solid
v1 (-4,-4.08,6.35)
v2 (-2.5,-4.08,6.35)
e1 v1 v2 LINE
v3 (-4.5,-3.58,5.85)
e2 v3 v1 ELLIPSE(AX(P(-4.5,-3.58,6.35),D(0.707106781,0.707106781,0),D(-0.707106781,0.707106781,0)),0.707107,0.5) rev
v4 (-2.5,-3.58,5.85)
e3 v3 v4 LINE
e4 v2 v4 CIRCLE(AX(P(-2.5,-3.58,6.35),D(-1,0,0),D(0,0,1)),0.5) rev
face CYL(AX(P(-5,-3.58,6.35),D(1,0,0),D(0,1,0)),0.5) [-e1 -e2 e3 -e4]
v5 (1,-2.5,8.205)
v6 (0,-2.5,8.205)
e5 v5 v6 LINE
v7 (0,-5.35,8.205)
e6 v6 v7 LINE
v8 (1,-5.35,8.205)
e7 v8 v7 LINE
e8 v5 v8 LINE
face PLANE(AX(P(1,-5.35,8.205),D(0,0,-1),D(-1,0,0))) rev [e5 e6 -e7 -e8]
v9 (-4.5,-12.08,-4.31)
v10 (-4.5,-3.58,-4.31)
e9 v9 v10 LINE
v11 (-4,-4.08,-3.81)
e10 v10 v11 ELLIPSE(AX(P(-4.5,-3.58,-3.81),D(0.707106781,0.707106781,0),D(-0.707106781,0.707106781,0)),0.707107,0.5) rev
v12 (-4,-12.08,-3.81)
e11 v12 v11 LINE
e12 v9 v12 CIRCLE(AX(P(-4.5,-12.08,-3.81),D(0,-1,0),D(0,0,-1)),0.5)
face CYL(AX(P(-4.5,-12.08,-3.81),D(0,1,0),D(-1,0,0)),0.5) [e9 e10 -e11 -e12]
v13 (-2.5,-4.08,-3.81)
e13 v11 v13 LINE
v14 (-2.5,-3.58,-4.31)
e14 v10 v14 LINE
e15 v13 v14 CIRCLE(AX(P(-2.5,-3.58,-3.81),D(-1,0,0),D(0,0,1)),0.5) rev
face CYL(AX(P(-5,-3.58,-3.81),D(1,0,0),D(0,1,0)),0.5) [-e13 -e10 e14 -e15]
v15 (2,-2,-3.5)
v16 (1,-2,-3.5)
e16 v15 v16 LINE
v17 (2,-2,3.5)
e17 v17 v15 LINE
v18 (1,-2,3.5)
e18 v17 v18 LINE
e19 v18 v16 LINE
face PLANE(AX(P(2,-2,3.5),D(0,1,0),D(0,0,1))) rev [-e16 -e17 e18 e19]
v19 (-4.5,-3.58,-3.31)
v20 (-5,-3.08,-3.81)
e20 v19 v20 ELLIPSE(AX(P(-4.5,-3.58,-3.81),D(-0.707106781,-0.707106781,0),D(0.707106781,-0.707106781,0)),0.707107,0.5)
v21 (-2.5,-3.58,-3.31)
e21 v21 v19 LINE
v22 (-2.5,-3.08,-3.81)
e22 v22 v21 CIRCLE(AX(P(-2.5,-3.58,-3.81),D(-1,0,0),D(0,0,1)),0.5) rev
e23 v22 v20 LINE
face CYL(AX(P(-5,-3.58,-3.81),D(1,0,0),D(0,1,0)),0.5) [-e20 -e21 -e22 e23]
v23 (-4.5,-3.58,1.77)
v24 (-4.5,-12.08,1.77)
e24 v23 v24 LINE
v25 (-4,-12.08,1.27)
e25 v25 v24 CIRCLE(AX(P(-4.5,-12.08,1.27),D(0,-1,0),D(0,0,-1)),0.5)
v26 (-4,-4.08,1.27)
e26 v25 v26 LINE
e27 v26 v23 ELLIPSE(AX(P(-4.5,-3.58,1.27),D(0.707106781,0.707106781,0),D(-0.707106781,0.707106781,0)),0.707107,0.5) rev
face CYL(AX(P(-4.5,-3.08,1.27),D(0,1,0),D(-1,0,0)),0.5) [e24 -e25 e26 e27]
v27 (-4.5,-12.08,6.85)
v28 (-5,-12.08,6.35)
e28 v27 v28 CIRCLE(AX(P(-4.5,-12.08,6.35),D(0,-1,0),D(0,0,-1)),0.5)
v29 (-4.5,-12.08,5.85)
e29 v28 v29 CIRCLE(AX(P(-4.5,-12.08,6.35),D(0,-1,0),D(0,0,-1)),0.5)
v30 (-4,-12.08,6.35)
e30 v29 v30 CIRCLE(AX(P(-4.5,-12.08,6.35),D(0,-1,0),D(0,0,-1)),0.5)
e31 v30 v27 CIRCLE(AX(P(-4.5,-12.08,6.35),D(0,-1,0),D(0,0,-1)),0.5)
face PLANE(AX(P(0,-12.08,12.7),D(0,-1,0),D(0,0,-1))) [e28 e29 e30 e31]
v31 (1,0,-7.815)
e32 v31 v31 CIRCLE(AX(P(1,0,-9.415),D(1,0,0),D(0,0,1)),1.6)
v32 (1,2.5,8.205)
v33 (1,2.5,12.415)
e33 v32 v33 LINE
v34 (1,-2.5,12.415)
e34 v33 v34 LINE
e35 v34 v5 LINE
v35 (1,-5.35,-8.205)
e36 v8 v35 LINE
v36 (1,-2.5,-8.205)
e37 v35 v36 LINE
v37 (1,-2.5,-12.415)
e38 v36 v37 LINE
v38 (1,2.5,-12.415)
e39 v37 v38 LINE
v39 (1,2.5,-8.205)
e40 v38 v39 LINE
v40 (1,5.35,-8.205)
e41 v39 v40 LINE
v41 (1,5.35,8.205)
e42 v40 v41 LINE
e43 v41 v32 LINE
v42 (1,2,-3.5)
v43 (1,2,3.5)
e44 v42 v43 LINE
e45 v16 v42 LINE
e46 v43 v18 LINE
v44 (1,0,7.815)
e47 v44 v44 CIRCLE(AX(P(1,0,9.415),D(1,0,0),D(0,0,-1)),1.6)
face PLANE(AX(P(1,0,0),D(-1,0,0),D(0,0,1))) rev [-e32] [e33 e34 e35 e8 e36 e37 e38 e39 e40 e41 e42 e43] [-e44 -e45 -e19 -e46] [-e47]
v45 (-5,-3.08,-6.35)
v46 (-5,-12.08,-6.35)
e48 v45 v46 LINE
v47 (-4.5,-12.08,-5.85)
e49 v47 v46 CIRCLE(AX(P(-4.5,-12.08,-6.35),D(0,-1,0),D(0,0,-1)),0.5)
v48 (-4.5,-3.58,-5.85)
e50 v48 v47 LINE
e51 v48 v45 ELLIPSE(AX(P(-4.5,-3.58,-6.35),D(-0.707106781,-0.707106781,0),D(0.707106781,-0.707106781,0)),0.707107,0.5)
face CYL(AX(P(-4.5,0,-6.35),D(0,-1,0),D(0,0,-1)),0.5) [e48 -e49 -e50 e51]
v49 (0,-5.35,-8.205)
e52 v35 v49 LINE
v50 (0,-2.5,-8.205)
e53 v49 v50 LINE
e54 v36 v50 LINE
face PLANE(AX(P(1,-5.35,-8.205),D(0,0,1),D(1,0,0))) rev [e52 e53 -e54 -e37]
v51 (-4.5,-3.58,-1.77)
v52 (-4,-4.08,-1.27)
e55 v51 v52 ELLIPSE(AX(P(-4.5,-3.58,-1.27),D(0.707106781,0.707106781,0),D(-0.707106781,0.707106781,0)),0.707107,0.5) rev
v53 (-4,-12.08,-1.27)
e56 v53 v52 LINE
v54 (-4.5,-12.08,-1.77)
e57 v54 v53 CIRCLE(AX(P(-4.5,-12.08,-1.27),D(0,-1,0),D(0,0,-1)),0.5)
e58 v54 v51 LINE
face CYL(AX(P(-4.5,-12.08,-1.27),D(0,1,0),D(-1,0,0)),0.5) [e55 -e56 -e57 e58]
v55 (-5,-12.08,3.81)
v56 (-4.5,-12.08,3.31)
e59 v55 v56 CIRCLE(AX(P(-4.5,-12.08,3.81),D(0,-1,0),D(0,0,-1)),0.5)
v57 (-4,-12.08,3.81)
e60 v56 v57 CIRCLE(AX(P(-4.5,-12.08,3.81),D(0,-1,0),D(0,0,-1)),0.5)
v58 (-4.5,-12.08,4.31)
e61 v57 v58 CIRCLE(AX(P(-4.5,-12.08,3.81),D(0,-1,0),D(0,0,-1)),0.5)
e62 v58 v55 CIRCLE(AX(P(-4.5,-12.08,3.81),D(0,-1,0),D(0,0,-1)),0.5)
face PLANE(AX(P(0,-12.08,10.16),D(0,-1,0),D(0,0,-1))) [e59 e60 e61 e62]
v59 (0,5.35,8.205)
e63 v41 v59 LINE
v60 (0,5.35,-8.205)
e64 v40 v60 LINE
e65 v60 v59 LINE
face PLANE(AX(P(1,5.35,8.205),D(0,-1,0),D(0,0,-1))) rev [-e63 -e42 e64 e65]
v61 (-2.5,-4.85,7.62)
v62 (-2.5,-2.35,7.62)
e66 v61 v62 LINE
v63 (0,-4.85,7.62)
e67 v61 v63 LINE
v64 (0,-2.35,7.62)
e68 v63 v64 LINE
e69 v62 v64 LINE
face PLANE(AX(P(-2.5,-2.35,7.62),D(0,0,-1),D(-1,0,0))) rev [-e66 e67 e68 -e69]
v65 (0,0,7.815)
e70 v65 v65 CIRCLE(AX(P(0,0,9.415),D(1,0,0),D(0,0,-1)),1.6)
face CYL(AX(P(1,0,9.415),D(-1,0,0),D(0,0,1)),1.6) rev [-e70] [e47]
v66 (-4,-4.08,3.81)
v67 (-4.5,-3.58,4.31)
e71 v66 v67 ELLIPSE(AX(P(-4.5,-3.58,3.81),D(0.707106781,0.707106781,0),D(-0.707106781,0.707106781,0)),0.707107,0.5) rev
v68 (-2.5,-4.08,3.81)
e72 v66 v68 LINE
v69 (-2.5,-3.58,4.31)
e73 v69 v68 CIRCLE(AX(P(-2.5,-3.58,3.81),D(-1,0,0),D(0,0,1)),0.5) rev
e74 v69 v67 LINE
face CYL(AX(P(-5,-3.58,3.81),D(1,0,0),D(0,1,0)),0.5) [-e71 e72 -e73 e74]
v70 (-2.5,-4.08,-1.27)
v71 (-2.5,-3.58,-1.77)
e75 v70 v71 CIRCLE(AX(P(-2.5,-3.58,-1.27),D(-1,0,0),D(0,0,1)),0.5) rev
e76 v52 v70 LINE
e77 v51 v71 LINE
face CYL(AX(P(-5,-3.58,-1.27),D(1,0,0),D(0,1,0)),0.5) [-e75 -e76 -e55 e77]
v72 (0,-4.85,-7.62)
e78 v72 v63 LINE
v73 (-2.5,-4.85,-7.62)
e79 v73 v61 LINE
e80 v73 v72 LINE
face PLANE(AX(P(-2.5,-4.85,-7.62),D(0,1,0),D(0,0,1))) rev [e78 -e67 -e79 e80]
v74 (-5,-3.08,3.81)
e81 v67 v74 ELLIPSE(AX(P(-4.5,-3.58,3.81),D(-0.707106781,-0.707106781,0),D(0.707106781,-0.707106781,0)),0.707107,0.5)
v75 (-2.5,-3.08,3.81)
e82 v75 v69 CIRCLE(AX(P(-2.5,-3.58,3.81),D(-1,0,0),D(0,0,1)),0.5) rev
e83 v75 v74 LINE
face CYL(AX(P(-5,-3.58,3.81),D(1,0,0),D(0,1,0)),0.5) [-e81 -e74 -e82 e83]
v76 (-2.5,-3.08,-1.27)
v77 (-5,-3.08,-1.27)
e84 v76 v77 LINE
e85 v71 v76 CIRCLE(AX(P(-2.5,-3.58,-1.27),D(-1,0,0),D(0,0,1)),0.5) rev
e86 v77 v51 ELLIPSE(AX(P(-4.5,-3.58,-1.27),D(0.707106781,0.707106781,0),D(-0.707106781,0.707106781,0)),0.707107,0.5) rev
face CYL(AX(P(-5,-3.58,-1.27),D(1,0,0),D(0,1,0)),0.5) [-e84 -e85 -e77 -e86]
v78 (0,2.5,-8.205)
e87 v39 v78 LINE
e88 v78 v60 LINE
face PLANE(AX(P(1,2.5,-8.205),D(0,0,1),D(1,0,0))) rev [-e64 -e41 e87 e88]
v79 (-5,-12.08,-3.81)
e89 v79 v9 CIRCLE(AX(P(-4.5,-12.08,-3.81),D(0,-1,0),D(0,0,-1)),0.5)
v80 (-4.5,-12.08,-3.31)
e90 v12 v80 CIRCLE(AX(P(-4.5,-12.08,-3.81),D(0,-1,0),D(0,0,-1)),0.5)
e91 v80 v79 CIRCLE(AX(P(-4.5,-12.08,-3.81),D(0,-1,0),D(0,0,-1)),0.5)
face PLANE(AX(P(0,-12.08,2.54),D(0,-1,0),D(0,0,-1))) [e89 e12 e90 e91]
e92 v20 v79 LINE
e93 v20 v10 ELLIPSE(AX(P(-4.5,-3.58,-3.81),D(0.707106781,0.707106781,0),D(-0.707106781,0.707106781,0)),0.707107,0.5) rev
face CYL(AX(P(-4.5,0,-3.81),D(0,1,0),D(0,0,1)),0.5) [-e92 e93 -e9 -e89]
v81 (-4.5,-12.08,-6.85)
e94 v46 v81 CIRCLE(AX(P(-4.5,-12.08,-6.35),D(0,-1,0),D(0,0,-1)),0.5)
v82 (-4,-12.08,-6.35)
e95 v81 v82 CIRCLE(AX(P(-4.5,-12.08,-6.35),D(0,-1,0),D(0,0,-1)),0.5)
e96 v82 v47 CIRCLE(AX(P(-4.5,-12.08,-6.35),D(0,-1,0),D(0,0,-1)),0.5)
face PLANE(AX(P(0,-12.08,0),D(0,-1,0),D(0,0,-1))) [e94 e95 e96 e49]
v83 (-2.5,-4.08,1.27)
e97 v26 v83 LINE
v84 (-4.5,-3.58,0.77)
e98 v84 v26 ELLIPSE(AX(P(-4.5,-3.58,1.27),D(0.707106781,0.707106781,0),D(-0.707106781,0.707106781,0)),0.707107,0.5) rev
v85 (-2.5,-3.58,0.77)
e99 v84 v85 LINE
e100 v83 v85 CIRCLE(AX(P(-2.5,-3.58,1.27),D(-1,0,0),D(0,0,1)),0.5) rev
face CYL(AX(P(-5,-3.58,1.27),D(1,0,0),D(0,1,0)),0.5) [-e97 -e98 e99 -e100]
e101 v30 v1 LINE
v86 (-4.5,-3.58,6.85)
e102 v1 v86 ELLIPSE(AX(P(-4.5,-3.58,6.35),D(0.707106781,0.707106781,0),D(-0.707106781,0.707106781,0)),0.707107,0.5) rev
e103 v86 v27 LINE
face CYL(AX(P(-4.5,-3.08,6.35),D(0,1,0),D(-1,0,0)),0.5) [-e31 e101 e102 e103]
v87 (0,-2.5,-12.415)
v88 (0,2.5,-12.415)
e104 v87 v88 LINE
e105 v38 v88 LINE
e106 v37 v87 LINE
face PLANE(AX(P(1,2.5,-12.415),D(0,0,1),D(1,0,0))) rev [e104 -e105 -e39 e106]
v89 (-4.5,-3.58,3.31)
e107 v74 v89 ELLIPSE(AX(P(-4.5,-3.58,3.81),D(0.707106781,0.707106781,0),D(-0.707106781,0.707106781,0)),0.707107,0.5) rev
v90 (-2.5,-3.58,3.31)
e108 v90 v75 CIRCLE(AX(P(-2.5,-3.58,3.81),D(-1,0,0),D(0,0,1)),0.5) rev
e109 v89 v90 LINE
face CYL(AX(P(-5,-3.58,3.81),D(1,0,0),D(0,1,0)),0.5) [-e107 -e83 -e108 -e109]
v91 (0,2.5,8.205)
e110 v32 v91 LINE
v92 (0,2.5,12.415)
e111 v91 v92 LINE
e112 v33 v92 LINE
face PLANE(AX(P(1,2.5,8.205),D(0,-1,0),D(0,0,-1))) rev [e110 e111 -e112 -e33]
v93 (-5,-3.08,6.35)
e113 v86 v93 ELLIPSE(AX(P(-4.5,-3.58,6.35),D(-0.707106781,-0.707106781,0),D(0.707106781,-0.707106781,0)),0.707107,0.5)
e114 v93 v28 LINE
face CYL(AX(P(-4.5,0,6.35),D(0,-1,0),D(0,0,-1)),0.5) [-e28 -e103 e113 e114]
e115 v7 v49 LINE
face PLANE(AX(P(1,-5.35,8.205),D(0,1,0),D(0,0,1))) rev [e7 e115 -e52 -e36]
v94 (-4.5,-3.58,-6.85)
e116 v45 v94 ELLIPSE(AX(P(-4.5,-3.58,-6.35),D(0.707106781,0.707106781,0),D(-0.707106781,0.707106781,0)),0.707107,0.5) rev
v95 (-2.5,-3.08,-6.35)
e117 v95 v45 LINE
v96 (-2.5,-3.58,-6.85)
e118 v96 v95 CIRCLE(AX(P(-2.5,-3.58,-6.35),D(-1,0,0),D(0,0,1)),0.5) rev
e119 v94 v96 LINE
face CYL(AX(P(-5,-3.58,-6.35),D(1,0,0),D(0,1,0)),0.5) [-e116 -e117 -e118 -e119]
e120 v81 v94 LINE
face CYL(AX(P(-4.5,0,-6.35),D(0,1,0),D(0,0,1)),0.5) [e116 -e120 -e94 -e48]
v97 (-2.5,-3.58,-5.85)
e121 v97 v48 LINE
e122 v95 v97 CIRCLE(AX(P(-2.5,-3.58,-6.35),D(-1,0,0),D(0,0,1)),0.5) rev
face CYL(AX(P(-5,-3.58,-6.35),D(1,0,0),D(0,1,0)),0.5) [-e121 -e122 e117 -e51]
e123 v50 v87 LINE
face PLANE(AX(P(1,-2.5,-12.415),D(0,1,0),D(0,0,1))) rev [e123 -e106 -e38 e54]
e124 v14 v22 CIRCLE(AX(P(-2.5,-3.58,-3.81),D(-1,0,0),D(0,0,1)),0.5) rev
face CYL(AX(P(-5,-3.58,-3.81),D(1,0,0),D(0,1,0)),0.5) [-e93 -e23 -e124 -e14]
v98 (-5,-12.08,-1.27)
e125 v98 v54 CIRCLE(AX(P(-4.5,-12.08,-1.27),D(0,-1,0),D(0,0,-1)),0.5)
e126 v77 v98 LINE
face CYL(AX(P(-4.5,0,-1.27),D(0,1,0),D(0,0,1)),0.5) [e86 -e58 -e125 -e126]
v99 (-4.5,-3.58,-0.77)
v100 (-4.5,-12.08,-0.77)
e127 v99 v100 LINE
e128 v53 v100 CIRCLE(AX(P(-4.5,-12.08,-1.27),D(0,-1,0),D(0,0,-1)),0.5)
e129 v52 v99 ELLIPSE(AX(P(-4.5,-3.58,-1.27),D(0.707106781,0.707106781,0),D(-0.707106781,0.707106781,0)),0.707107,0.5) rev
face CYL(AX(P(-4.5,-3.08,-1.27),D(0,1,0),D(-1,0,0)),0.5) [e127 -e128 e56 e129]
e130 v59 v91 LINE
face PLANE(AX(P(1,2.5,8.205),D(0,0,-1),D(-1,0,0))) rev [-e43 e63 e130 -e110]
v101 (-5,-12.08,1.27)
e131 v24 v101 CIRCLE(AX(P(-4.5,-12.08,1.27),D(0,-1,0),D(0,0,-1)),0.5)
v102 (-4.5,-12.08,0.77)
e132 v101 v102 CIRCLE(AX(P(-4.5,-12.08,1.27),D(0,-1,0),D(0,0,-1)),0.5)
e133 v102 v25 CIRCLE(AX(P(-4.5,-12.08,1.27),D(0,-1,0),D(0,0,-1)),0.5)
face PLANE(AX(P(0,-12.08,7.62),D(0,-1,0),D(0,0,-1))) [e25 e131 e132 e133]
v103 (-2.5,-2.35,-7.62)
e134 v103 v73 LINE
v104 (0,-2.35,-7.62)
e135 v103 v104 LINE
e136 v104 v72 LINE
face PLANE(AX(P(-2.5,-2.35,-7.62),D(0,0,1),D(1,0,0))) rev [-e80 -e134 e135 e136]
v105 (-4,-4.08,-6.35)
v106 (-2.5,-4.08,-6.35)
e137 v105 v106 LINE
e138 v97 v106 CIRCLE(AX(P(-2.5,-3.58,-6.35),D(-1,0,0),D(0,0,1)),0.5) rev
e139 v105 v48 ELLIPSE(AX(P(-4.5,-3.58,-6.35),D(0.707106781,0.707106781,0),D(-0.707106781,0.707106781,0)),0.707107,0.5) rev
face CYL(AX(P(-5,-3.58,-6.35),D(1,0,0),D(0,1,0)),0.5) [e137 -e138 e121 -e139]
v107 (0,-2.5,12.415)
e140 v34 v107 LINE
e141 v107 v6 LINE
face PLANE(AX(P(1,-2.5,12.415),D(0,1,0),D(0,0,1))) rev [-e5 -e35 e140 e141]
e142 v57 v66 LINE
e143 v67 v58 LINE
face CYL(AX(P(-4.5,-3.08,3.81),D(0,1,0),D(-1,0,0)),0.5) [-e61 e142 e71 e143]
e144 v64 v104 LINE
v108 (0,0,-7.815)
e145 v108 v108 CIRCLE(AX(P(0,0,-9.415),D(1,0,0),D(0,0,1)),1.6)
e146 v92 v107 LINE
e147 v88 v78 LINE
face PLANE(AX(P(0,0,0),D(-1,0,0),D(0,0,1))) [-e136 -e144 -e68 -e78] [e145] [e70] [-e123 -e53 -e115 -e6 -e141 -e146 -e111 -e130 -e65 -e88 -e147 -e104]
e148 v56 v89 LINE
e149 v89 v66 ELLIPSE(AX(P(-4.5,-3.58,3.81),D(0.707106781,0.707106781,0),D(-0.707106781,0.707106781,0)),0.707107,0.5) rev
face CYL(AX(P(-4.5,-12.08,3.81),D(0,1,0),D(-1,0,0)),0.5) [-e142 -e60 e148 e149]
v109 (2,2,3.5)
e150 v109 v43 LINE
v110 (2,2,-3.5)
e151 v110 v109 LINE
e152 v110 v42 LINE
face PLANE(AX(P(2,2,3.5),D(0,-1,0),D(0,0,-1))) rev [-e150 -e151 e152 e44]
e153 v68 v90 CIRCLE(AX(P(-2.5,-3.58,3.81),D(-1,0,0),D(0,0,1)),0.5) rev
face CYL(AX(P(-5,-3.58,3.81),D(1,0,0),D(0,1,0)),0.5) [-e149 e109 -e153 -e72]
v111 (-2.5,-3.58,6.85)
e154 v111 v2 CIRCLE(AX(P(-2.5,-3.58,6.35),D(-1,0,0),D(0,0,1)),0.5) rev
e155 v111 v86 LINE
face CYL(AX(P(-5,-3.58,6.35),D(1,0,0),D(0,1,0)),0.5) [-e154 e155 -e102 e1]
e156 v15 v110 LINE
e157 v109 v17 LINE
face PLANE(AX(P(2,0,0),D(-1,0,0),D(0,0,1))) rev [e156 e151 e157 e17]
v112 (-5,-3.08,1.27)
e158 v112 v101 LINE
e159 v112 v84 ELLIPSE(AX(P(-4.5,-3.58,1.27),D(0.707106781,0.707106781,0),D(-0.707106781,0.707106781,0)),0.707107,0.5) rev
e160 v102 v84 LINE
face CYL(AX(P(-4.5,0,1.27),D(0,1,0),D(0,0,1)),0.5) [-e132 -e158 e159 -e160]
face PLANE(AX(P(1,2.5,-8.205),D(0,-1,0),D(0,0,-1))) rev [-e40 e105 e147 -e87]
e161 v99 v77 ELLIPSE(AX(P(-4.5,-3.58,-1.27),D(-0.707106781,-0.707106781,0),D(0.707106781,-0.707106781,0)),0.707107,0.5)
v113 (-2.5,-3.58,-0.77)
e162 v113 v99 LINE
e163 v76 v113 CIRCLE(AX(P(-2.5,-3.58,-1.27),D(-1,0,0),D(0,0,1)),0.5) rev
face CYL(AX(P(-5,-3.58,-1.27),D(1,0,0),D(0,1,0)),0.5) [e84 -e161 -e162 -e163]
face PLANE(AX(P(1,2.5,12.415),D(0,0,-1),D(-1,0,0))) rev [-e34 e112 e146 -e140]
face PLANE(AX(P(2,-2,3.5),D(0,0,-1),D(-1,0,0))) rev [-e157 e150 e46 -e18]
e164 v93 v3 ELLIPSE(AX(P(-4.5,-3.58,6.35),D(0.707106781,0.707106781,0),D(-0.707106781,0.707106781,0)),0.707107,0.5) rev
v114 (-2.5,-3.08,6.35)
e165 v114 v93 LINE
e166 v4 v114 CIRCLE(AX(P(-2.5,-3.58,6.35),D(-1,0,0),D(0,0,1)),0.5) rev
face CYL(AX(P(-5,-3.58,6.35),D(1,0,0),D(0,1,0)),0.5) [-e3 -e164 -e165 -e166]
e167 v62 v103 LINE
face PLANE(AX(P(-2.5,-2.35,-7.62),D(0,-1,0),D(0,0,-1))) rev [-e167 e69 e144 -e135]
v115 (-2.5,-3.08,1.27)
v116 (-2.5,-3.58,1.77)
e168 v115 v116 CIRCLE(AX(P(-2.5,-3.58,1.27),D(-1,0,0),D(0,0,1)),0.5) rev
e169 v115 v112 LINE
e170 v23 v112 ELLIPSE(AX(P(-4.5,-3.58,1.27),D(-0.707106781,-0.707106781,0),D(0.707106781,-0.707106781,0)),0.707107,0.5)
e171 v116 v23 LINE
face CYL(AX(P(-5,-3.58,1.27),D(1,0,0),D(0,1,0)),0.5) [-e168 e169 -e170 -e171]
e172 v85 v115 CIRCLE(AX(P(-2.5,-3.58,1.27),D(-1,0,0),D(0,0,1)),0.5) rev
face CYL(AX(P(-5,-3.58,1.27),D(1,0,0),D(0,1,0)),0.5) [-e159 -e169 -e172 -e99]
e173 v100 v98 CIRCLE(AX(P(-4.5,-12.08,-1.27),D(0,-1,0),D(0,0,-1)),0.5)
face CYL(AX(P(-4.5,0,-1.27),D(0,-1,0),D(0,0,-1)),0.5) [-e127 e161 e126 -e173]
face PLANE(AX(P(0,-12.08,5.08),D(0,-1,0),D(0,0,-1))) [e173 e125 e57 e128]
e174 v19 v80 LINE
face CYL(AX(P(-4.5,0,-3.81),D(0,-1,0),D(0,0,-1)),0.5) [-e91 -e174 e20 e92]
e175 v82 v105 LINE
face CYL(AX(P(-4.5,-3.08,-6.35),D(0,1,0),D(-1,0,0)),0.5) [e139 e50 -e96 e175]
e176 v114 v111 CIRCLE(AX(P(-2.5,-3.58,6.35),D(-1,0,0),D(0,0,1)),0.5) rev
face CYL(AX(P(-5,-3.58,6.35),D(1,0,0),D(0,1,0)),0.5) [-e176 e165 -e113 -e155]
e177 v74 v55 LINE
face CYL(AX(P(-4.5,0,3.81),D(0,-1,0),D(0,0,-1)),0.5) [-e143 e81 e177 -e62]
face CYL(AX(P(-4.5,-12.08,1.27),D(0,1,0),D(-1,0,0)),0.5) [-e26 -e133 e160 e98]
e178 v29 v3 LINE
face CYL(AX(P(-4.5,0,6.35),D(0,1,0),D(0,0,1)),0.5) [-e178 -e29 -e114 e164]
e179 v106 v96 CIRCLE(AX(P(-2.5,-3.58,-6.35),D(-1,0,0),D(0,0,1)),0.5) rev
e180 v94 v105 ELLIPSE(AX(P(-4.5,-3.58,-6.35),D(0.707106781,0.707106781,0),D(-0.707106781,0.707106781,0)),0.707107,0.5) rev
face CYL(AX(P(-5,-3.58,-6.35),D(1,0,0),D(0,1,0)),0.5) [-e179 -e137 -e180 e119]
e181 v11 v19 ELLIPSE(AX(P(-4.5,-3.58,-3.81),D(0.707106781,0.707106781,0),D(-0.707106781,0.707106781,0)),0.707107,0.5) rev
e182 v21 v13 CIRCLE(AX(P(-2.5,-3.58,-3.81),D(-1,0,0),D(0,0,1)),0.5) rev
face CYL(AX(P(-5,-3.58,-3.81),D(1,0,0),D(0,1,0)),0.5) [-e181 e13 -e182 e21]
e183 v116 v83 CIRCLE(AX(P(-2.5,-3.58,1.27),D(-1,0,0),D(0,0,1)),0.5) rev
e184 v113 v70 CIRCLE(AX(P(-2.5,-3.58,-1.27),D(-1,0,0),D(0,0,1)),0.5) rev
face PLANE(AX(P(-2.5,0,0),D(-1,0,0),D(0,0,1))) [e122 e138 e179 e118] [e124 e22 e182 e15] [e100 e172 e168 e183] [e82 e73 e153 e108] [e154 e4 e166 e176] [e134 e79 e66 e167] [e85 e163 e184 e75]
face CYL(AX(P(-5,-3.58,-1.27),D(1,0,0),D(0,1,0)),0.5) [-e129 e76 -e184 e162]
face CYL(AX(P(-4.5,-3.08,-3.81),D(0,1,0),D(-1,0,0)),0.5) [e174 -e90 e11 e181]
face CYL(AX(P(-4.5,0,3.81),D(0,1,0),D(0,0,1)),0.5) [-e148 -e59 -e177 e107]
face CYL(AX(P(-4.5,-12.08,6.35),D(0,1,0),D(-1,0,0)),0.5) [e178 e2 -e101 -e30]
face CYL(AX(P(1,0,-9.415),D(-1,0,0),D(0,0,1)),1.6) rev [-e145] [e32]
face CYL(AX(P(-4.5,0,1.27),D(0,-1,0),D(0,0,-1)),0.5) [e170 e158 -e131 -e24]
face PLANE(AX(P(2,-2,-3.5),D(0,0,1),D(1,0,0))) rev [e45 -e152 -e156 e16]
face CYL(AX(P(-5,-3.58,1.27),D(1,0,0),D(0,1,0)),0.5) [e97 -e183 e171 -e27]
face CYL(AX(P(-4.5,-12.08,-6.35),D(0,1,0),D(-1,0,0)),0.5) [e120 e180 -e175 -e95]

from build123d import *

# Parameters (mm, degrees)
SKETCH1_R              = 1.6
BOSS_EXTRUDE1_DEPTH    = 1
SKETCH2_W              = 7
SKETCH2_H              = 4
BOSS_EXTRUDE2_DEPTH    = 1
SKETCH4_W              = 15.24
SKETCH4_H              = 2.5
BOSS_EXTRUDE3_DEPTH    = 2.5
SKETCH6_W              = 1
SKETCH6_H              = 1
BOSS_EXTRUDE4_DEPTH    = 2.5
SKETCH8_W              = 1
SKETCH8_H              = 1
BOSS_EXTRUDE5_DEPTH    = 8
FILLET1_R              = 0.5
LPATTERN1_COUNT        = 6
LPATTERN1_PITCH        = 2.54
FILLET1_OF_LPATTERN1_R = 0.5


with BuildPart() as part:
    # Sketch1 → Boss-Extrude1 (new body)
    with BuildSketch(Plane(origin=(0, 0, 0), x_dir=(0, 0, -1), z_dir=(1, 0, 0))):
        Polygon((-8.205, 2.5), (-12.415, 2.5), (-12.415, -2.5), (-8.205, -2.5), (-8.205, -5.35), (8.205, -5.35), (8.205, -2.5), (12.415, -2.5), (12.415, 2.5), (8.205, 2.5), (8.205, 5.35), (-8.205, 5.35), align=None)
        with Locations((-9.415, 0)):
            Circle(SKETCH1_R, mode=Mode.SUBTRACT)
        with Locations(Location((9.415, 0, 0), (0, 0, 180))):
            Circle(SKETCH1_R, mode=Mode.SUBTRACT)
    extrude(amount=BOSS_EXTRUDE1_DEPTH)

    # Sketch2 → Boss-Extrude2 (add)
    with BuildSketch(Plane(origin=(1, 0, 0), x_dir=(0, 0, -1), z_dir=(1, 0, 0))):
        Rectangle(SKETCH2_W, SKETCH2_H)
    extrude(amount=BOSS_EXTRUDE2_DEPTH)

    # Sketch4 → Boss-Extrude3 (add)
    with BuildSketch(Plane(origin=(0, 6.053191046, 0.231711856), x_dir=(0, 0, 1), z_dir=(-1, 0, 0))):
        with Locations((-0.231711856, -9.653191046)):
            Rectangle(SKETCH4_W, SKETCH4_H)
    extrude(amount=BOSS_EXTRUDE3_DEPTH)

    # Sketch6 → Boss-Extrude4 (add)
    with BuildSketch(Plane(origin=(-2.5, 6.053191046, 0.231711856), x_dir=(0, 0, 1), z_dir=(-1, 0, 0))):
        with Locations((-6.581711856, -9.633191046)):
            Rectangle(SKETCH6_W, SKETCH6_H)
    boss_extrude4 = extrude(amount=BOSS_EXTRUDE4_DEPTH)

    # Sketch8 → Boss-Extrude5 (add)
    with BuildSketch(Plane(origin=(1, -4.08, 0.231711856), x_dir=(0, 0, 1), z_dir=(0, -1, 0))):
        with Locations((-6.581711856, 5.5)):
            Rectangle(SKETCH8_W, SKETCH8_H)
    boss_extrude5 = extrude(amount=BOSS_EXTRUDE5_DEPTH)

    # Fillet1
    fillet1_edges = [part.edges().sort_by_distance(p)[0] for p in [
        (-4, -8.08, -5.85),
        (-4, -8.08, -6.85),
        (-3.25, -4.08, -5.85),
        (-3.25, -4.08, -6.85),
        (-3.75, -3.08, -5.85),
        (-3.75, -3.08, -6.85),
        (-5, -7.58, -5.85),
        (-5, -7.58, -6.85),
    ]]
    fillet(fillet1_edges, radius=FILLET1_R - 0.0001)  # a hair under: the kernel refuses the full size

    # LPattern1: Boss-Extrude4, Boss-Extrude5 ×6
    with Locations(*[(0, 0, i * LPATTERN1_PITCH) for i in range(1, LPATTERN1_COUNT)]):
        add(boss_extrude4)
        add(boss_extrude5)

    # Fillet1 of LPattern1
    fillet1_of_lpattern1_edges = [part.edges().sort_by_distance(p)[0] for p in [
        (-4, -8.08, -3.31),
        (-4, -8.08, -4.31),
        (-3.25, -4.08, -3.31),
        (-3.25, -4.08, -4.31),
        (-3.75, -3.08, -3.31),
        (-3.75, -3.08, -4.31),
        (-5, -7.58, -3.31),
        (-5, -7.58, -4.31),
        (-4, -8.08, -0.77),
        (-4, -8.08, -1.77),
        (-3.25, -4.08, -0.77),
        (-3.25, -4.08, -1.77),
        (-3.75, -3.08, -0.77),
        (-3.75, -3.08, -1.77),
        (-5, -7.58, -0.77),
        (-5, -7.58, -1.77),
        (-4, -8.08, 1.77),
        (-4, -8.08, 0.77),
        (-3.25, -4.08, 1.77),
        (-3.25, -4.08, 0.77),
        (-3.75, -3.08, 1.77),
        (-3.75, -3.08, 0.77),
        (-5, -7.58, 1.77),
        (-5, -7.58, 0.77),
        (-4, -8.08, 4.31),
        (-4, -8.08, 3.31),
        (-3.25, -4.08, 4.31),
        (-3.25, -4.08, 3.31),
        (-3.75, -3.08, 4.31),
        (-3.75, -3.08, 3.31),
        (-5, -7.58, 4.31),
        (-5, -7.58, 3.31),
        (-4, -8.08, 6.85),
        (-4, -8.08, 5.85),
        (-3.25, -4.08, 6.85),
        (-3.25, -4.08, 5.85),
        (-3.75, -3.08, 6.85),
        (-3.75, -3.08, 5.85),
        (-5, -7.58, 6.85),
        (-5, -7.58, 5.85),
    ]]
    fillet(fillet1_of_lpattern1_edges, radius=FILLET1_OF_LPATTERN1_R - 0.0001)  # a hair under: the kernel refuses the full size


solid = part.part
